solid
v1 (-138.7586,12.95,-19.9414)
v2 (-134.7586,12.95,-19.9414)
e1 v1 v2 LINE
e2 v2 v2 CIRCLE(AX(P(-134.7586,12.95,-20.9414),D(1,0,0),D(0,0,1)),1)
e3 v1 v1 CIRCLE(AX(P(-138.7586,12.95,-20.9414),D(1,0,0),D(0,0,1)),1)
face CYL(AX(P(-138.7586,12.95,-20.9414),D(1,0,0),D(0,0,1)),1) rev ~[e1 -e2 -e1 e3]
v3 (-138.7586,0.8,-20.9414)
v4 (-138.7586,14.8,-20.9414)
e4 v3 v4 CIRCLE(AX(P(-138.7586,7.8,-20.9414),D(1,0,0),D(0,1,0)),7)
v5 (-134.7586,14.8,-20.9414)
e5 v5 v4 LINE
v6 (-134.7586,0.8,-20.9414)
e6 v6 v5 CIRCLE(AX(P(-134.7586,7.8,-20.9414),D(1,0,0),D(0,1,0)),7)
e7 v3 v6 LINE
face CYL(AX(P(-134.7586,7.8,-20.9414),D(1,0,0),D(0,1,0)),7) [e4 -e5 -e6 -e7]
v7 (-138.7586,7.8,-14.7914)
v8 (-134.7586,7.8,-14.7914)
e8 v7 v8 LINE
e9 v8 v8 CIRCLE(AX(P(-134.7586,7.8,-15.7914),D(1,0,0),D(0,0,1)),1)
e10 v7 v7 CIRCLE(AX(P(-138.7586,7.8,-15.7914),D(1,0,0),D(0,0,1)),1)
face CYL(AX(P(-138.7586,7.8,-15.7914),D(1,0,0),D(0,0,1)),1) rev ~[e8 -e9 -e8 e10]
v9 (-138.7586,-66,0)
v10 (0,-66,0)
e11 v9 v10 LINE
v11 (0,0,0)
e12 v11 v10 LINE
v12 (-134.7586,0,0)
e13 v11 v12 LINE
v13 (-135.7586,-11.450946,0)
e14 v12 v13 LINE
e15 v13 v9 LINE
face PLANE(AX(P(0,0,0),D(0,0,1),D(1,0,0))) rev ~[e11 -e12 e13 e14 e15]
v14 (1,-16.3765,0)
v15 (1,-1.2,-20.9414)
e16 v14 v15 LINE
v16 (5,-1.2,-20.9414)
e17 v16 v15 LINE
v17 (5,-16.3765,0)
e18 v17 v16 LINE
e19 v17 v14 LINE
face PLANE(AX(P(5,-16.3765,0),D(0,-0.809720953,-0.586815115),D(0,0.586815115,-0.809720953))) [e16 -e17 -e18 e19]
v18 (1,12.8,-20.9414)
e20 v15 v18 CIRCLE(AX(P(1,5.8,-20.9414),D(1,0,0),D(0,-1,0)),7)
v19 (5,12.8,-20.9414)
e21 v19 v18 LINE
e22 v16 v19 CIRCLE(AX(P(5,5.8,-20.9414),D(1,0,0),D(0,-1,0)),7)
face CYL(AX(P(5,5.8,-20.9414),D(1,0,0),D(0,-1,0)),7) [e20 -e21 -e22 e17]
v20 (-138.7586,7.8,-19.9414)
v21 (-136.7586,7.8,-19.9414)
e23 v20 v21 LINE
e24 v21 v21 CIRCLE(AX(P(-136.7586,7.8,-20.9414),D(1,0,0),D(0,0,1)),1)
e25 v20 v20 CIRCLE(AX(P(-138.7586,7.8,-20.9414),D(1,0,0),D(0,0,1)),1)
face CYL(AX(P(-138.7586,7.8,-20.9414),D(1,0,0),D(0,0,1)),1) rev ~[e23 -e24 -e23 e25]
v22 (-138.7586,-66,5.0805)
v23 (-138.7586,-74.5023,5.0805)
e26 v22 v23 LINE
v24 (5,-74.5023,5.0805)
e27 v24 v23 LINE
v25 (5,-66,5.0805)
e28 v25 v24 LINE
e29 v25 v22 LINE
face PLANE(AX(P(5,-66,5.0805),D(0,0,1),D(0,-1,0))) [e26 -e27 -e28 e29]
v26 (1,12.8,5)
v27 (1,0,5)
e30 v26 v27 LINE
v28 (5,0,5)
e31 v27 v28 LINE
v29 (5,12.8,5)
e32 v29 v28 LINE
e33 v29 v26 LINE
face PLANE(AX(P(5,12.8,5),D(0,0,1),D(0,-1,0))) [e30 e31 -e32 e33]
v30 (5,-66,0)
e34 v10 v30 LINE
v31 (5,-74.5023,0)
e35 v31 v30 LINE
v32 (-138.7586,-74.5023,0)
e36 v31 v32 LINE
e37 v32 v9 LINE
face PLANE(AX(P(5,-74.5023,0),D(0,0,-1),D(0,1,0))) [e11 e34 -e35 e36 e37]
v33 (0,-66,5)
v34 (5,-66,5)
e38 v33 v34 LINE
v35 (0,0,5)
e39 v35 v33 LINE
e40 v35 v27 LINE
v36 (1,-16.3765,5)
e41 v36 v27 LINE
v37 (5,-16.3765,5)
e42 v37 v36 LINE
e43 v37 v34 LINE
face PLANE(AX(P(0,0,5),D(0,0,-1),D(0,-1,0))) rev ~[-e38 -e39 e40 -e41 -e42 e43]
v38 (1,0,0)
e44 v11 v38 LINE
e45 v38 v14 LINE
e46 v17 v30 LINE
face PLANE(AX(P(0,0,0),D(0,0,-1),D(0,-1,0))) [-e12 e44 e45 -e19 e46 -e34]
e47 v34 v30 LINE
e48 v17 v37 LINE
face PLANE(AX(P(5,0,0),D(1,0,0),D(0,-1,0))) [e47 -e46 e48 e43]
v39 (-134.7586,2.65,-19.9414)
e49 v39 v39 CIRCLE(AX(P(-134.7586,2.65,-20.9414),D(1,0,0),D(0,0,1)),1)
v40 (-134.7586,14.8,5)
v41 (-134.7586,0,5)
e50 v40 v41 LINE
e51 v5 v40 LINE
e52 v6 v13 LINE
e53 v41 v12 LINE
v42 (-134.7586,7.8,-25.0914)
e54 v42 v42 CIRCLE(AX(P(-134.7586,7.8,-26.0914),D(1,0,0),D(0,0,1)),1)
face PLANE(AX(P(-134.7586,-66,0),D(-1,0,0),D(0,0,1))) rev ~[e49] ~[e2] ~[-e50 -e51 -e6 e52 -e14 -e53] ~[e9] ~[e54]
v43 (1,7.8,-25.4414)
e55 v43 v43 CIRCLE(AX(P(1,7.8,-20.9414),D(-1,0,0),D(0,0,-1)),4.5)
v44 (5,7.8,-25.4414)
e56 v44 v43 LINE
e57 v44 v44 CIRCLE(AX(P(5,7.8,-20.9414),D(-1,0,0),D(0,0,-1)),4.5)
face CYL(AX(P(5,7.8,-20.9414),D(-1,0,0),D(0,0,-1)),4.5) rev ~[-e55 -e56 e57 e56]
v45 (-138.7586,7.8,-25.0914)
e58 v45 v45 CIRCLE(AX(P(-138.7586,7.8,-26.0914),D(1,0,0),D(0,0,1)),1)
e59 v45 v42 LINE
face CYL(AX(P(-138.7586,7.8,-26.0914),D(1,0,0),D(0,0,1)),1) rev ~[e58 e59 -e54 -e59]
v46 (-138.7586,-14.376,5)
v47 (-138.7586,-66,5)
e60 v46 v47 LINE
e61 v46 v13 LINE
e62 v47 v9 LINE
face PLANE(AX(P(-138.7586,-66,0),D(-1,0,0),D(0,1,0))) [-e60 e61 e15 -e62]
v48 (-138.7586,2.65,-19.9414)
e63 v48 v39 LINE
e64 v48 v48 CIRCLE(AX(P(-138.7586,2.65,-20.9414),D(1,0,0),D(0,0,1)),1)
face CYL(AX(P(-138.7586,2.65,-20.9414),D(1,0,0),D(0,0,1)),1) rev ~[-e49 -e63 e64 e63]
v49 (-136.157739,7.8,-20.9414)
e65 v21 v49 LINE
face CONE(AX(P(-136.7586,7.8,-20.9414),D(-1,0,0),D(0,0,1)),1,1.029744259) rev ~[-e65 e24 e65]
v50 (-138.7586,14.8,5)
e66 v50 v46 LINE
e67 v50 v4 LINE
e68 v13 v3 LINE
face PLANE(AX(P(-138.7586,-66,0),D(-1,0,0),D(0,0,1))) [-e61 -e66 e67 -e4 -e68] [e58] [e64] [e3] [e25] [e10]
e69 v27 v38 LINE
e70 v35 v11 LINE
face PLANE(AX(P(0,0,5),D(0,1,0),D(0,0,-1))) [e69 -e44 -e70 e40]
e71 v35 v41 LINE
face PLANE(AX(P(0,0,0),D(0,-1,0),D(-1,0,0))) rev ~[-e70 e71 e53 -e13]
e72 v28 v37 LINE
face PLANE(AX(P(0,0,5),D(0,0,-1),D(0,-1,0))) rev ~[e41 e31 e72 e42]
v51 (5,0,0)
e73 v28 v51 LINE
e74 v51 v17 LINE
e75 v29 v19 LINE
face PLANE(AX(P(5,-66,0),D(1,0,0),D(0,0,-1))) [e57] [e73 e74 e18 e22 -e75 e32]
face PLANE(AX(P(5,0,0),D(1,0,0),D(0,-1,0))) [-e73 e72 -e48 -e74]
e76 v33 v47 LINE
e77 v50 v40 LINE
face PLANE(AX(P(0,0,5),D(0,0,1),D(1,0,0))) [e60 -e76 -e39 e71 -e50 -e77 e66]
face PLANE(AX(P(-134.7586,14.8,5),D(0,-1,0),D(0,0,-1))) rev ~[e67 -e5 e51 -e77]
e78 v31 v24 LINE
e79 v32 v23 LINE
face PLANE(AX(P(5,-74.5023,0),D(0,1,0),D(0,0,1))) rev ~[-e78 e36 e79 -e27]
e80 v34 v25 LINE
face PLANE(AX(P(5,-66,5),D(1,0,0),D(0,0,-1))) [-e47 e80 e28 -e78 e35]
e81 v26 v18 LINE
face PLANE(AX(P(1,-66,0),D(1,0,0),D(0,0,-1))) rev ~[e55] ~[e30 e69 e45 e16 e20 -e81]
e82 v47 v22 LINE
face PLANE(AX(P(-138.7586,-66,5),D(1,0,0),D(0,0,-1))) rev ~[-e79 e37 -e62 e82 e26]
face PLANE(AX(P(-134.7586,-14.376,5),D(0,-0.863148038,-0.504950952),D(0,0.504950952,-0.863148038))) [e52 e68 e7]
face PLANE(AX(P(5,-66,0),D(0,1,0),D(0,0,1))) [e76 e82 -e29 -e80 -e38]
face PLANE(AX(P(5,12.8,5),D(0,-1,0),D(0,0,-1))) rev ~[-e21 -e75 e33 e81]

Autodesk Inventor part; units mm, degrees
ref_plane "YZ Plane" through (0, 0, 0) normal (1, 0, 0) x (0, 1, 0)
ref_plane "XZ Plane" through (0, 0, 0) normal (0, 1, 0) x (-1, 0, 0)
ref_plane "XY Plane" through (0, 0, 0) normal (0, 0, 1) x (1, 0, 0)
sketch "Boceto1" plane through (0, 0, 0) normal (0, 0, 1) x (1, 0, 0)
  line L0 (0, 0) -> (-127, 0) projected
  line L1 (-5, -66) -> (-122, -66) projected
  line L2 (-127, 0) -> (0, 0)
  line L3 (0, 0) -> (0, -66)
  line L4 (0, -66) -> (-127, -66)
  line L5 (-127, -66) -> (-127, 0)
extrude "Extrusión1" add sketch "Boceto1" along normal blind 5
move faces "Desplazar1" translate (-7.7586, 0, 0) faces at (-127, -44, 1.6667)
sketch "Boceto3" plane through (-134.7586, -66, 0) normal (-1, 0, 0) x (0, 0, 1)
  line L0 (-19.6414, 77.5) -> (-19.6414, 74.1) projected
  line L1 (-22.2414, 74.1) -> (-22.2414, 77.5) projected
  line L2 (-22.2414, 66.1) -> (-22.2414, 69.5) projected
  line L3 (-19.6414, 69.5) -> (-19.6414, 66.1) projected
  line L4 (-15.2414, 70.5) -> (-18.6414, 70.5) projected
  line L5 (-18.6414, 73.1) -> (-15.2414, 73.1) projected
  line L6 (-26.6414, 73.1) -> (-23.2414, 73.1) projected
  line L7 (-23.2414, 70.5) -> (-26.6414, 70.5) projected
  arc A0 (-19.6414, 77.5) -> (-22.2414, 77.5) centre (-20.9414, 77.5) ccw projected
  arc A1 (-22.2414, 66.1) -> (-19.6414, 66.1) centre (-20.9414, 66.1) ccw projected
  line L8 (5, 66) -> (5, 78.8)
  line L9 (5, 66) -> (5, 64.8)
  line L10 (5, 78.8) -> (5, 49.624)
  line L11 (5, 66) -> (5, 0) projected
  arc A2 (-19.6414, 79.5) -> (-22.2414, 79.5) centre (-20.9414, 79.5) ccw projected
  arc A3 (-22.2414, 68.1) -> (-19.6414, 68.1) centre (-20.9414, 68.1) ccw projected
  line L12 (5, 49.624) -> (5, 51.624)
  line L13 (5, 51.624) -> (-20.9414, 66.8)
  line L14 (5, 78.8) -> (5, 80.8)
  line L15 (5, 80.8) -> (-20.9414, 80.8)
  circle A4 centre (-20.9414, 73.8) radius 0.75 projected
  arc A5 (-20.9414, 80.8) -> (-20.9414, 66.8) centre (-20.9414, 73.8) ccw
  circle A6 centre (-20.9414, 73.8) radius 1.45 projected
  circle A7 centre (-20.9414, 78.95) radius 0.5 projected
  point P0 (0, 66)
  point P1 (-20.9414, 71.8)
  point P2 (-20.9414, 78.8)
  dimension "d28" = 29.176
  dimension "d29" = 2
  dimension "d30" = 2
extrude "Extrusión2" add sketch "Boceto3" along normal blind 4 contours L0 A6 L1 A0 A7 | A6 | A7 A0 | A0 A7 | A5 L15 L14 L8 L9 L10 L13 A1 L3 A3 L2 | L2 A3 A5 | L13 A3 L3 A1 | A4
move faces "Desplazar2" translate (-4, 0, 0) faces at (-134.7586, -30.609, 1.6667)
sketch "Boceto4" plane through (-138.7586, -66, 0) normal (-1, 0, 0) x (0, 0, 1)
  circle A0 centre (-15.7914, 73.8) radius 0.5 projected
  circle A1 centre (-20.9414, 68.65) radius 0.5 projected
  circle A2 centre (-26.0914, 73.8) radius 0.5 projected
  circle A3 centre (-20.9414, 78.95) radius 0.5 projected
  circle A4 centre (-20.9414, 78.95) radius 0.5 projected
  circle A5 centre (-20.9414, 78.95) radius 0.5 projected
  point P0 (0, 66)
hole "Agujero1" at (-138.7586, 7.8, -15.7914) at (-138.7586, 2.65, -20.9414) at (-138.7586, 7.8, -26.0914) direction (1, 0, 0) diameter 2 end up to surface
ref_plane "Plano de trabajo1" through (0, 0, -79) normal (1, 0, 0) x (0, 0, -1)
offset faces "Tamaño1" outward 5 faces at (0, -22, 1.6667)
sketch "Boceto6" plane through (5, -66, 0) normal (1, 0, 0) x (0, 0, -1)
  arc A0 (20.9414, 64.8) -> (20.9414, 78.8) centre (20.9414, 71.8) ccw projected
  line L0 (-5, 78.8) -> (20.9414, 78.8) projected
  line L1 (-5, 78.8) -> (-5, 66) projected
  line L2 (-5, 0) -> (-5, 66) projected
  line L3 (0, 49.6235) -> (20.9414, 64.8) projected
  line L4 (0, 49.6235) -> (-5, 49.6235)
  line L5 (-5, 0) -> (-5, 66) projected
  point P0 (0, 66)
extrude "Extrusión3" add sketch "Boceto6" against normal blind 4
sketch "Boceto7" plane through (5, -66, 5) normal (1, 0, 0) x (0, 0, -1)
  circle A0 centre (25.9414, 73.8) radius 1.45 projected
  point P0 (5, 66)
hole "Agujero2" at (5, 7.8, -20.9414) direction (-1, 0, 0) diameter 9 end up to surface
hole "Agujero3" at (-138.7586, 7.8, -20.9414) direction (1, 0, 0) diameter 2 depth 2 tip angle 118
sketch "Boceto9" plane through (-138.7586, -66, 0) normal (-1, 0, 0) x (0, 0, 1)
  circle A0 centre (-20.9414, 78.95) radius 0.5 projected
  point P0 (0, 66)
hole "Agujero4" at (-138.7586, 12.95, -20.9414) direction (1, 0, 0) diameter 2 end up to surface
sketch "Boceto10" plane through (5, -66, 5) normal (1, 0, 0) x (0, 0, -1)
  circle A0 centre (49.5, 31.4977) radius 40 projected
  line L0 (49.5, -8.5023) -> (-0.0805, -8.5023)
  line L1 (-0.0805, -8.5023) -> (5, -8.5023)
  line L2 (5, -8.5023) -> (5, 0)
  line L3 (5, 0) -> (-0.0805, 0)
  line L4 (-0.0805, 0) -> (-0.0805, -8.5023)
  point P0 (5, 66)
extrude "Extrusión4" add sketch "Boceto10" against normal up to surface (143.7586 mm away) contours L0 L4 L3 L2
properties part number "pala"
